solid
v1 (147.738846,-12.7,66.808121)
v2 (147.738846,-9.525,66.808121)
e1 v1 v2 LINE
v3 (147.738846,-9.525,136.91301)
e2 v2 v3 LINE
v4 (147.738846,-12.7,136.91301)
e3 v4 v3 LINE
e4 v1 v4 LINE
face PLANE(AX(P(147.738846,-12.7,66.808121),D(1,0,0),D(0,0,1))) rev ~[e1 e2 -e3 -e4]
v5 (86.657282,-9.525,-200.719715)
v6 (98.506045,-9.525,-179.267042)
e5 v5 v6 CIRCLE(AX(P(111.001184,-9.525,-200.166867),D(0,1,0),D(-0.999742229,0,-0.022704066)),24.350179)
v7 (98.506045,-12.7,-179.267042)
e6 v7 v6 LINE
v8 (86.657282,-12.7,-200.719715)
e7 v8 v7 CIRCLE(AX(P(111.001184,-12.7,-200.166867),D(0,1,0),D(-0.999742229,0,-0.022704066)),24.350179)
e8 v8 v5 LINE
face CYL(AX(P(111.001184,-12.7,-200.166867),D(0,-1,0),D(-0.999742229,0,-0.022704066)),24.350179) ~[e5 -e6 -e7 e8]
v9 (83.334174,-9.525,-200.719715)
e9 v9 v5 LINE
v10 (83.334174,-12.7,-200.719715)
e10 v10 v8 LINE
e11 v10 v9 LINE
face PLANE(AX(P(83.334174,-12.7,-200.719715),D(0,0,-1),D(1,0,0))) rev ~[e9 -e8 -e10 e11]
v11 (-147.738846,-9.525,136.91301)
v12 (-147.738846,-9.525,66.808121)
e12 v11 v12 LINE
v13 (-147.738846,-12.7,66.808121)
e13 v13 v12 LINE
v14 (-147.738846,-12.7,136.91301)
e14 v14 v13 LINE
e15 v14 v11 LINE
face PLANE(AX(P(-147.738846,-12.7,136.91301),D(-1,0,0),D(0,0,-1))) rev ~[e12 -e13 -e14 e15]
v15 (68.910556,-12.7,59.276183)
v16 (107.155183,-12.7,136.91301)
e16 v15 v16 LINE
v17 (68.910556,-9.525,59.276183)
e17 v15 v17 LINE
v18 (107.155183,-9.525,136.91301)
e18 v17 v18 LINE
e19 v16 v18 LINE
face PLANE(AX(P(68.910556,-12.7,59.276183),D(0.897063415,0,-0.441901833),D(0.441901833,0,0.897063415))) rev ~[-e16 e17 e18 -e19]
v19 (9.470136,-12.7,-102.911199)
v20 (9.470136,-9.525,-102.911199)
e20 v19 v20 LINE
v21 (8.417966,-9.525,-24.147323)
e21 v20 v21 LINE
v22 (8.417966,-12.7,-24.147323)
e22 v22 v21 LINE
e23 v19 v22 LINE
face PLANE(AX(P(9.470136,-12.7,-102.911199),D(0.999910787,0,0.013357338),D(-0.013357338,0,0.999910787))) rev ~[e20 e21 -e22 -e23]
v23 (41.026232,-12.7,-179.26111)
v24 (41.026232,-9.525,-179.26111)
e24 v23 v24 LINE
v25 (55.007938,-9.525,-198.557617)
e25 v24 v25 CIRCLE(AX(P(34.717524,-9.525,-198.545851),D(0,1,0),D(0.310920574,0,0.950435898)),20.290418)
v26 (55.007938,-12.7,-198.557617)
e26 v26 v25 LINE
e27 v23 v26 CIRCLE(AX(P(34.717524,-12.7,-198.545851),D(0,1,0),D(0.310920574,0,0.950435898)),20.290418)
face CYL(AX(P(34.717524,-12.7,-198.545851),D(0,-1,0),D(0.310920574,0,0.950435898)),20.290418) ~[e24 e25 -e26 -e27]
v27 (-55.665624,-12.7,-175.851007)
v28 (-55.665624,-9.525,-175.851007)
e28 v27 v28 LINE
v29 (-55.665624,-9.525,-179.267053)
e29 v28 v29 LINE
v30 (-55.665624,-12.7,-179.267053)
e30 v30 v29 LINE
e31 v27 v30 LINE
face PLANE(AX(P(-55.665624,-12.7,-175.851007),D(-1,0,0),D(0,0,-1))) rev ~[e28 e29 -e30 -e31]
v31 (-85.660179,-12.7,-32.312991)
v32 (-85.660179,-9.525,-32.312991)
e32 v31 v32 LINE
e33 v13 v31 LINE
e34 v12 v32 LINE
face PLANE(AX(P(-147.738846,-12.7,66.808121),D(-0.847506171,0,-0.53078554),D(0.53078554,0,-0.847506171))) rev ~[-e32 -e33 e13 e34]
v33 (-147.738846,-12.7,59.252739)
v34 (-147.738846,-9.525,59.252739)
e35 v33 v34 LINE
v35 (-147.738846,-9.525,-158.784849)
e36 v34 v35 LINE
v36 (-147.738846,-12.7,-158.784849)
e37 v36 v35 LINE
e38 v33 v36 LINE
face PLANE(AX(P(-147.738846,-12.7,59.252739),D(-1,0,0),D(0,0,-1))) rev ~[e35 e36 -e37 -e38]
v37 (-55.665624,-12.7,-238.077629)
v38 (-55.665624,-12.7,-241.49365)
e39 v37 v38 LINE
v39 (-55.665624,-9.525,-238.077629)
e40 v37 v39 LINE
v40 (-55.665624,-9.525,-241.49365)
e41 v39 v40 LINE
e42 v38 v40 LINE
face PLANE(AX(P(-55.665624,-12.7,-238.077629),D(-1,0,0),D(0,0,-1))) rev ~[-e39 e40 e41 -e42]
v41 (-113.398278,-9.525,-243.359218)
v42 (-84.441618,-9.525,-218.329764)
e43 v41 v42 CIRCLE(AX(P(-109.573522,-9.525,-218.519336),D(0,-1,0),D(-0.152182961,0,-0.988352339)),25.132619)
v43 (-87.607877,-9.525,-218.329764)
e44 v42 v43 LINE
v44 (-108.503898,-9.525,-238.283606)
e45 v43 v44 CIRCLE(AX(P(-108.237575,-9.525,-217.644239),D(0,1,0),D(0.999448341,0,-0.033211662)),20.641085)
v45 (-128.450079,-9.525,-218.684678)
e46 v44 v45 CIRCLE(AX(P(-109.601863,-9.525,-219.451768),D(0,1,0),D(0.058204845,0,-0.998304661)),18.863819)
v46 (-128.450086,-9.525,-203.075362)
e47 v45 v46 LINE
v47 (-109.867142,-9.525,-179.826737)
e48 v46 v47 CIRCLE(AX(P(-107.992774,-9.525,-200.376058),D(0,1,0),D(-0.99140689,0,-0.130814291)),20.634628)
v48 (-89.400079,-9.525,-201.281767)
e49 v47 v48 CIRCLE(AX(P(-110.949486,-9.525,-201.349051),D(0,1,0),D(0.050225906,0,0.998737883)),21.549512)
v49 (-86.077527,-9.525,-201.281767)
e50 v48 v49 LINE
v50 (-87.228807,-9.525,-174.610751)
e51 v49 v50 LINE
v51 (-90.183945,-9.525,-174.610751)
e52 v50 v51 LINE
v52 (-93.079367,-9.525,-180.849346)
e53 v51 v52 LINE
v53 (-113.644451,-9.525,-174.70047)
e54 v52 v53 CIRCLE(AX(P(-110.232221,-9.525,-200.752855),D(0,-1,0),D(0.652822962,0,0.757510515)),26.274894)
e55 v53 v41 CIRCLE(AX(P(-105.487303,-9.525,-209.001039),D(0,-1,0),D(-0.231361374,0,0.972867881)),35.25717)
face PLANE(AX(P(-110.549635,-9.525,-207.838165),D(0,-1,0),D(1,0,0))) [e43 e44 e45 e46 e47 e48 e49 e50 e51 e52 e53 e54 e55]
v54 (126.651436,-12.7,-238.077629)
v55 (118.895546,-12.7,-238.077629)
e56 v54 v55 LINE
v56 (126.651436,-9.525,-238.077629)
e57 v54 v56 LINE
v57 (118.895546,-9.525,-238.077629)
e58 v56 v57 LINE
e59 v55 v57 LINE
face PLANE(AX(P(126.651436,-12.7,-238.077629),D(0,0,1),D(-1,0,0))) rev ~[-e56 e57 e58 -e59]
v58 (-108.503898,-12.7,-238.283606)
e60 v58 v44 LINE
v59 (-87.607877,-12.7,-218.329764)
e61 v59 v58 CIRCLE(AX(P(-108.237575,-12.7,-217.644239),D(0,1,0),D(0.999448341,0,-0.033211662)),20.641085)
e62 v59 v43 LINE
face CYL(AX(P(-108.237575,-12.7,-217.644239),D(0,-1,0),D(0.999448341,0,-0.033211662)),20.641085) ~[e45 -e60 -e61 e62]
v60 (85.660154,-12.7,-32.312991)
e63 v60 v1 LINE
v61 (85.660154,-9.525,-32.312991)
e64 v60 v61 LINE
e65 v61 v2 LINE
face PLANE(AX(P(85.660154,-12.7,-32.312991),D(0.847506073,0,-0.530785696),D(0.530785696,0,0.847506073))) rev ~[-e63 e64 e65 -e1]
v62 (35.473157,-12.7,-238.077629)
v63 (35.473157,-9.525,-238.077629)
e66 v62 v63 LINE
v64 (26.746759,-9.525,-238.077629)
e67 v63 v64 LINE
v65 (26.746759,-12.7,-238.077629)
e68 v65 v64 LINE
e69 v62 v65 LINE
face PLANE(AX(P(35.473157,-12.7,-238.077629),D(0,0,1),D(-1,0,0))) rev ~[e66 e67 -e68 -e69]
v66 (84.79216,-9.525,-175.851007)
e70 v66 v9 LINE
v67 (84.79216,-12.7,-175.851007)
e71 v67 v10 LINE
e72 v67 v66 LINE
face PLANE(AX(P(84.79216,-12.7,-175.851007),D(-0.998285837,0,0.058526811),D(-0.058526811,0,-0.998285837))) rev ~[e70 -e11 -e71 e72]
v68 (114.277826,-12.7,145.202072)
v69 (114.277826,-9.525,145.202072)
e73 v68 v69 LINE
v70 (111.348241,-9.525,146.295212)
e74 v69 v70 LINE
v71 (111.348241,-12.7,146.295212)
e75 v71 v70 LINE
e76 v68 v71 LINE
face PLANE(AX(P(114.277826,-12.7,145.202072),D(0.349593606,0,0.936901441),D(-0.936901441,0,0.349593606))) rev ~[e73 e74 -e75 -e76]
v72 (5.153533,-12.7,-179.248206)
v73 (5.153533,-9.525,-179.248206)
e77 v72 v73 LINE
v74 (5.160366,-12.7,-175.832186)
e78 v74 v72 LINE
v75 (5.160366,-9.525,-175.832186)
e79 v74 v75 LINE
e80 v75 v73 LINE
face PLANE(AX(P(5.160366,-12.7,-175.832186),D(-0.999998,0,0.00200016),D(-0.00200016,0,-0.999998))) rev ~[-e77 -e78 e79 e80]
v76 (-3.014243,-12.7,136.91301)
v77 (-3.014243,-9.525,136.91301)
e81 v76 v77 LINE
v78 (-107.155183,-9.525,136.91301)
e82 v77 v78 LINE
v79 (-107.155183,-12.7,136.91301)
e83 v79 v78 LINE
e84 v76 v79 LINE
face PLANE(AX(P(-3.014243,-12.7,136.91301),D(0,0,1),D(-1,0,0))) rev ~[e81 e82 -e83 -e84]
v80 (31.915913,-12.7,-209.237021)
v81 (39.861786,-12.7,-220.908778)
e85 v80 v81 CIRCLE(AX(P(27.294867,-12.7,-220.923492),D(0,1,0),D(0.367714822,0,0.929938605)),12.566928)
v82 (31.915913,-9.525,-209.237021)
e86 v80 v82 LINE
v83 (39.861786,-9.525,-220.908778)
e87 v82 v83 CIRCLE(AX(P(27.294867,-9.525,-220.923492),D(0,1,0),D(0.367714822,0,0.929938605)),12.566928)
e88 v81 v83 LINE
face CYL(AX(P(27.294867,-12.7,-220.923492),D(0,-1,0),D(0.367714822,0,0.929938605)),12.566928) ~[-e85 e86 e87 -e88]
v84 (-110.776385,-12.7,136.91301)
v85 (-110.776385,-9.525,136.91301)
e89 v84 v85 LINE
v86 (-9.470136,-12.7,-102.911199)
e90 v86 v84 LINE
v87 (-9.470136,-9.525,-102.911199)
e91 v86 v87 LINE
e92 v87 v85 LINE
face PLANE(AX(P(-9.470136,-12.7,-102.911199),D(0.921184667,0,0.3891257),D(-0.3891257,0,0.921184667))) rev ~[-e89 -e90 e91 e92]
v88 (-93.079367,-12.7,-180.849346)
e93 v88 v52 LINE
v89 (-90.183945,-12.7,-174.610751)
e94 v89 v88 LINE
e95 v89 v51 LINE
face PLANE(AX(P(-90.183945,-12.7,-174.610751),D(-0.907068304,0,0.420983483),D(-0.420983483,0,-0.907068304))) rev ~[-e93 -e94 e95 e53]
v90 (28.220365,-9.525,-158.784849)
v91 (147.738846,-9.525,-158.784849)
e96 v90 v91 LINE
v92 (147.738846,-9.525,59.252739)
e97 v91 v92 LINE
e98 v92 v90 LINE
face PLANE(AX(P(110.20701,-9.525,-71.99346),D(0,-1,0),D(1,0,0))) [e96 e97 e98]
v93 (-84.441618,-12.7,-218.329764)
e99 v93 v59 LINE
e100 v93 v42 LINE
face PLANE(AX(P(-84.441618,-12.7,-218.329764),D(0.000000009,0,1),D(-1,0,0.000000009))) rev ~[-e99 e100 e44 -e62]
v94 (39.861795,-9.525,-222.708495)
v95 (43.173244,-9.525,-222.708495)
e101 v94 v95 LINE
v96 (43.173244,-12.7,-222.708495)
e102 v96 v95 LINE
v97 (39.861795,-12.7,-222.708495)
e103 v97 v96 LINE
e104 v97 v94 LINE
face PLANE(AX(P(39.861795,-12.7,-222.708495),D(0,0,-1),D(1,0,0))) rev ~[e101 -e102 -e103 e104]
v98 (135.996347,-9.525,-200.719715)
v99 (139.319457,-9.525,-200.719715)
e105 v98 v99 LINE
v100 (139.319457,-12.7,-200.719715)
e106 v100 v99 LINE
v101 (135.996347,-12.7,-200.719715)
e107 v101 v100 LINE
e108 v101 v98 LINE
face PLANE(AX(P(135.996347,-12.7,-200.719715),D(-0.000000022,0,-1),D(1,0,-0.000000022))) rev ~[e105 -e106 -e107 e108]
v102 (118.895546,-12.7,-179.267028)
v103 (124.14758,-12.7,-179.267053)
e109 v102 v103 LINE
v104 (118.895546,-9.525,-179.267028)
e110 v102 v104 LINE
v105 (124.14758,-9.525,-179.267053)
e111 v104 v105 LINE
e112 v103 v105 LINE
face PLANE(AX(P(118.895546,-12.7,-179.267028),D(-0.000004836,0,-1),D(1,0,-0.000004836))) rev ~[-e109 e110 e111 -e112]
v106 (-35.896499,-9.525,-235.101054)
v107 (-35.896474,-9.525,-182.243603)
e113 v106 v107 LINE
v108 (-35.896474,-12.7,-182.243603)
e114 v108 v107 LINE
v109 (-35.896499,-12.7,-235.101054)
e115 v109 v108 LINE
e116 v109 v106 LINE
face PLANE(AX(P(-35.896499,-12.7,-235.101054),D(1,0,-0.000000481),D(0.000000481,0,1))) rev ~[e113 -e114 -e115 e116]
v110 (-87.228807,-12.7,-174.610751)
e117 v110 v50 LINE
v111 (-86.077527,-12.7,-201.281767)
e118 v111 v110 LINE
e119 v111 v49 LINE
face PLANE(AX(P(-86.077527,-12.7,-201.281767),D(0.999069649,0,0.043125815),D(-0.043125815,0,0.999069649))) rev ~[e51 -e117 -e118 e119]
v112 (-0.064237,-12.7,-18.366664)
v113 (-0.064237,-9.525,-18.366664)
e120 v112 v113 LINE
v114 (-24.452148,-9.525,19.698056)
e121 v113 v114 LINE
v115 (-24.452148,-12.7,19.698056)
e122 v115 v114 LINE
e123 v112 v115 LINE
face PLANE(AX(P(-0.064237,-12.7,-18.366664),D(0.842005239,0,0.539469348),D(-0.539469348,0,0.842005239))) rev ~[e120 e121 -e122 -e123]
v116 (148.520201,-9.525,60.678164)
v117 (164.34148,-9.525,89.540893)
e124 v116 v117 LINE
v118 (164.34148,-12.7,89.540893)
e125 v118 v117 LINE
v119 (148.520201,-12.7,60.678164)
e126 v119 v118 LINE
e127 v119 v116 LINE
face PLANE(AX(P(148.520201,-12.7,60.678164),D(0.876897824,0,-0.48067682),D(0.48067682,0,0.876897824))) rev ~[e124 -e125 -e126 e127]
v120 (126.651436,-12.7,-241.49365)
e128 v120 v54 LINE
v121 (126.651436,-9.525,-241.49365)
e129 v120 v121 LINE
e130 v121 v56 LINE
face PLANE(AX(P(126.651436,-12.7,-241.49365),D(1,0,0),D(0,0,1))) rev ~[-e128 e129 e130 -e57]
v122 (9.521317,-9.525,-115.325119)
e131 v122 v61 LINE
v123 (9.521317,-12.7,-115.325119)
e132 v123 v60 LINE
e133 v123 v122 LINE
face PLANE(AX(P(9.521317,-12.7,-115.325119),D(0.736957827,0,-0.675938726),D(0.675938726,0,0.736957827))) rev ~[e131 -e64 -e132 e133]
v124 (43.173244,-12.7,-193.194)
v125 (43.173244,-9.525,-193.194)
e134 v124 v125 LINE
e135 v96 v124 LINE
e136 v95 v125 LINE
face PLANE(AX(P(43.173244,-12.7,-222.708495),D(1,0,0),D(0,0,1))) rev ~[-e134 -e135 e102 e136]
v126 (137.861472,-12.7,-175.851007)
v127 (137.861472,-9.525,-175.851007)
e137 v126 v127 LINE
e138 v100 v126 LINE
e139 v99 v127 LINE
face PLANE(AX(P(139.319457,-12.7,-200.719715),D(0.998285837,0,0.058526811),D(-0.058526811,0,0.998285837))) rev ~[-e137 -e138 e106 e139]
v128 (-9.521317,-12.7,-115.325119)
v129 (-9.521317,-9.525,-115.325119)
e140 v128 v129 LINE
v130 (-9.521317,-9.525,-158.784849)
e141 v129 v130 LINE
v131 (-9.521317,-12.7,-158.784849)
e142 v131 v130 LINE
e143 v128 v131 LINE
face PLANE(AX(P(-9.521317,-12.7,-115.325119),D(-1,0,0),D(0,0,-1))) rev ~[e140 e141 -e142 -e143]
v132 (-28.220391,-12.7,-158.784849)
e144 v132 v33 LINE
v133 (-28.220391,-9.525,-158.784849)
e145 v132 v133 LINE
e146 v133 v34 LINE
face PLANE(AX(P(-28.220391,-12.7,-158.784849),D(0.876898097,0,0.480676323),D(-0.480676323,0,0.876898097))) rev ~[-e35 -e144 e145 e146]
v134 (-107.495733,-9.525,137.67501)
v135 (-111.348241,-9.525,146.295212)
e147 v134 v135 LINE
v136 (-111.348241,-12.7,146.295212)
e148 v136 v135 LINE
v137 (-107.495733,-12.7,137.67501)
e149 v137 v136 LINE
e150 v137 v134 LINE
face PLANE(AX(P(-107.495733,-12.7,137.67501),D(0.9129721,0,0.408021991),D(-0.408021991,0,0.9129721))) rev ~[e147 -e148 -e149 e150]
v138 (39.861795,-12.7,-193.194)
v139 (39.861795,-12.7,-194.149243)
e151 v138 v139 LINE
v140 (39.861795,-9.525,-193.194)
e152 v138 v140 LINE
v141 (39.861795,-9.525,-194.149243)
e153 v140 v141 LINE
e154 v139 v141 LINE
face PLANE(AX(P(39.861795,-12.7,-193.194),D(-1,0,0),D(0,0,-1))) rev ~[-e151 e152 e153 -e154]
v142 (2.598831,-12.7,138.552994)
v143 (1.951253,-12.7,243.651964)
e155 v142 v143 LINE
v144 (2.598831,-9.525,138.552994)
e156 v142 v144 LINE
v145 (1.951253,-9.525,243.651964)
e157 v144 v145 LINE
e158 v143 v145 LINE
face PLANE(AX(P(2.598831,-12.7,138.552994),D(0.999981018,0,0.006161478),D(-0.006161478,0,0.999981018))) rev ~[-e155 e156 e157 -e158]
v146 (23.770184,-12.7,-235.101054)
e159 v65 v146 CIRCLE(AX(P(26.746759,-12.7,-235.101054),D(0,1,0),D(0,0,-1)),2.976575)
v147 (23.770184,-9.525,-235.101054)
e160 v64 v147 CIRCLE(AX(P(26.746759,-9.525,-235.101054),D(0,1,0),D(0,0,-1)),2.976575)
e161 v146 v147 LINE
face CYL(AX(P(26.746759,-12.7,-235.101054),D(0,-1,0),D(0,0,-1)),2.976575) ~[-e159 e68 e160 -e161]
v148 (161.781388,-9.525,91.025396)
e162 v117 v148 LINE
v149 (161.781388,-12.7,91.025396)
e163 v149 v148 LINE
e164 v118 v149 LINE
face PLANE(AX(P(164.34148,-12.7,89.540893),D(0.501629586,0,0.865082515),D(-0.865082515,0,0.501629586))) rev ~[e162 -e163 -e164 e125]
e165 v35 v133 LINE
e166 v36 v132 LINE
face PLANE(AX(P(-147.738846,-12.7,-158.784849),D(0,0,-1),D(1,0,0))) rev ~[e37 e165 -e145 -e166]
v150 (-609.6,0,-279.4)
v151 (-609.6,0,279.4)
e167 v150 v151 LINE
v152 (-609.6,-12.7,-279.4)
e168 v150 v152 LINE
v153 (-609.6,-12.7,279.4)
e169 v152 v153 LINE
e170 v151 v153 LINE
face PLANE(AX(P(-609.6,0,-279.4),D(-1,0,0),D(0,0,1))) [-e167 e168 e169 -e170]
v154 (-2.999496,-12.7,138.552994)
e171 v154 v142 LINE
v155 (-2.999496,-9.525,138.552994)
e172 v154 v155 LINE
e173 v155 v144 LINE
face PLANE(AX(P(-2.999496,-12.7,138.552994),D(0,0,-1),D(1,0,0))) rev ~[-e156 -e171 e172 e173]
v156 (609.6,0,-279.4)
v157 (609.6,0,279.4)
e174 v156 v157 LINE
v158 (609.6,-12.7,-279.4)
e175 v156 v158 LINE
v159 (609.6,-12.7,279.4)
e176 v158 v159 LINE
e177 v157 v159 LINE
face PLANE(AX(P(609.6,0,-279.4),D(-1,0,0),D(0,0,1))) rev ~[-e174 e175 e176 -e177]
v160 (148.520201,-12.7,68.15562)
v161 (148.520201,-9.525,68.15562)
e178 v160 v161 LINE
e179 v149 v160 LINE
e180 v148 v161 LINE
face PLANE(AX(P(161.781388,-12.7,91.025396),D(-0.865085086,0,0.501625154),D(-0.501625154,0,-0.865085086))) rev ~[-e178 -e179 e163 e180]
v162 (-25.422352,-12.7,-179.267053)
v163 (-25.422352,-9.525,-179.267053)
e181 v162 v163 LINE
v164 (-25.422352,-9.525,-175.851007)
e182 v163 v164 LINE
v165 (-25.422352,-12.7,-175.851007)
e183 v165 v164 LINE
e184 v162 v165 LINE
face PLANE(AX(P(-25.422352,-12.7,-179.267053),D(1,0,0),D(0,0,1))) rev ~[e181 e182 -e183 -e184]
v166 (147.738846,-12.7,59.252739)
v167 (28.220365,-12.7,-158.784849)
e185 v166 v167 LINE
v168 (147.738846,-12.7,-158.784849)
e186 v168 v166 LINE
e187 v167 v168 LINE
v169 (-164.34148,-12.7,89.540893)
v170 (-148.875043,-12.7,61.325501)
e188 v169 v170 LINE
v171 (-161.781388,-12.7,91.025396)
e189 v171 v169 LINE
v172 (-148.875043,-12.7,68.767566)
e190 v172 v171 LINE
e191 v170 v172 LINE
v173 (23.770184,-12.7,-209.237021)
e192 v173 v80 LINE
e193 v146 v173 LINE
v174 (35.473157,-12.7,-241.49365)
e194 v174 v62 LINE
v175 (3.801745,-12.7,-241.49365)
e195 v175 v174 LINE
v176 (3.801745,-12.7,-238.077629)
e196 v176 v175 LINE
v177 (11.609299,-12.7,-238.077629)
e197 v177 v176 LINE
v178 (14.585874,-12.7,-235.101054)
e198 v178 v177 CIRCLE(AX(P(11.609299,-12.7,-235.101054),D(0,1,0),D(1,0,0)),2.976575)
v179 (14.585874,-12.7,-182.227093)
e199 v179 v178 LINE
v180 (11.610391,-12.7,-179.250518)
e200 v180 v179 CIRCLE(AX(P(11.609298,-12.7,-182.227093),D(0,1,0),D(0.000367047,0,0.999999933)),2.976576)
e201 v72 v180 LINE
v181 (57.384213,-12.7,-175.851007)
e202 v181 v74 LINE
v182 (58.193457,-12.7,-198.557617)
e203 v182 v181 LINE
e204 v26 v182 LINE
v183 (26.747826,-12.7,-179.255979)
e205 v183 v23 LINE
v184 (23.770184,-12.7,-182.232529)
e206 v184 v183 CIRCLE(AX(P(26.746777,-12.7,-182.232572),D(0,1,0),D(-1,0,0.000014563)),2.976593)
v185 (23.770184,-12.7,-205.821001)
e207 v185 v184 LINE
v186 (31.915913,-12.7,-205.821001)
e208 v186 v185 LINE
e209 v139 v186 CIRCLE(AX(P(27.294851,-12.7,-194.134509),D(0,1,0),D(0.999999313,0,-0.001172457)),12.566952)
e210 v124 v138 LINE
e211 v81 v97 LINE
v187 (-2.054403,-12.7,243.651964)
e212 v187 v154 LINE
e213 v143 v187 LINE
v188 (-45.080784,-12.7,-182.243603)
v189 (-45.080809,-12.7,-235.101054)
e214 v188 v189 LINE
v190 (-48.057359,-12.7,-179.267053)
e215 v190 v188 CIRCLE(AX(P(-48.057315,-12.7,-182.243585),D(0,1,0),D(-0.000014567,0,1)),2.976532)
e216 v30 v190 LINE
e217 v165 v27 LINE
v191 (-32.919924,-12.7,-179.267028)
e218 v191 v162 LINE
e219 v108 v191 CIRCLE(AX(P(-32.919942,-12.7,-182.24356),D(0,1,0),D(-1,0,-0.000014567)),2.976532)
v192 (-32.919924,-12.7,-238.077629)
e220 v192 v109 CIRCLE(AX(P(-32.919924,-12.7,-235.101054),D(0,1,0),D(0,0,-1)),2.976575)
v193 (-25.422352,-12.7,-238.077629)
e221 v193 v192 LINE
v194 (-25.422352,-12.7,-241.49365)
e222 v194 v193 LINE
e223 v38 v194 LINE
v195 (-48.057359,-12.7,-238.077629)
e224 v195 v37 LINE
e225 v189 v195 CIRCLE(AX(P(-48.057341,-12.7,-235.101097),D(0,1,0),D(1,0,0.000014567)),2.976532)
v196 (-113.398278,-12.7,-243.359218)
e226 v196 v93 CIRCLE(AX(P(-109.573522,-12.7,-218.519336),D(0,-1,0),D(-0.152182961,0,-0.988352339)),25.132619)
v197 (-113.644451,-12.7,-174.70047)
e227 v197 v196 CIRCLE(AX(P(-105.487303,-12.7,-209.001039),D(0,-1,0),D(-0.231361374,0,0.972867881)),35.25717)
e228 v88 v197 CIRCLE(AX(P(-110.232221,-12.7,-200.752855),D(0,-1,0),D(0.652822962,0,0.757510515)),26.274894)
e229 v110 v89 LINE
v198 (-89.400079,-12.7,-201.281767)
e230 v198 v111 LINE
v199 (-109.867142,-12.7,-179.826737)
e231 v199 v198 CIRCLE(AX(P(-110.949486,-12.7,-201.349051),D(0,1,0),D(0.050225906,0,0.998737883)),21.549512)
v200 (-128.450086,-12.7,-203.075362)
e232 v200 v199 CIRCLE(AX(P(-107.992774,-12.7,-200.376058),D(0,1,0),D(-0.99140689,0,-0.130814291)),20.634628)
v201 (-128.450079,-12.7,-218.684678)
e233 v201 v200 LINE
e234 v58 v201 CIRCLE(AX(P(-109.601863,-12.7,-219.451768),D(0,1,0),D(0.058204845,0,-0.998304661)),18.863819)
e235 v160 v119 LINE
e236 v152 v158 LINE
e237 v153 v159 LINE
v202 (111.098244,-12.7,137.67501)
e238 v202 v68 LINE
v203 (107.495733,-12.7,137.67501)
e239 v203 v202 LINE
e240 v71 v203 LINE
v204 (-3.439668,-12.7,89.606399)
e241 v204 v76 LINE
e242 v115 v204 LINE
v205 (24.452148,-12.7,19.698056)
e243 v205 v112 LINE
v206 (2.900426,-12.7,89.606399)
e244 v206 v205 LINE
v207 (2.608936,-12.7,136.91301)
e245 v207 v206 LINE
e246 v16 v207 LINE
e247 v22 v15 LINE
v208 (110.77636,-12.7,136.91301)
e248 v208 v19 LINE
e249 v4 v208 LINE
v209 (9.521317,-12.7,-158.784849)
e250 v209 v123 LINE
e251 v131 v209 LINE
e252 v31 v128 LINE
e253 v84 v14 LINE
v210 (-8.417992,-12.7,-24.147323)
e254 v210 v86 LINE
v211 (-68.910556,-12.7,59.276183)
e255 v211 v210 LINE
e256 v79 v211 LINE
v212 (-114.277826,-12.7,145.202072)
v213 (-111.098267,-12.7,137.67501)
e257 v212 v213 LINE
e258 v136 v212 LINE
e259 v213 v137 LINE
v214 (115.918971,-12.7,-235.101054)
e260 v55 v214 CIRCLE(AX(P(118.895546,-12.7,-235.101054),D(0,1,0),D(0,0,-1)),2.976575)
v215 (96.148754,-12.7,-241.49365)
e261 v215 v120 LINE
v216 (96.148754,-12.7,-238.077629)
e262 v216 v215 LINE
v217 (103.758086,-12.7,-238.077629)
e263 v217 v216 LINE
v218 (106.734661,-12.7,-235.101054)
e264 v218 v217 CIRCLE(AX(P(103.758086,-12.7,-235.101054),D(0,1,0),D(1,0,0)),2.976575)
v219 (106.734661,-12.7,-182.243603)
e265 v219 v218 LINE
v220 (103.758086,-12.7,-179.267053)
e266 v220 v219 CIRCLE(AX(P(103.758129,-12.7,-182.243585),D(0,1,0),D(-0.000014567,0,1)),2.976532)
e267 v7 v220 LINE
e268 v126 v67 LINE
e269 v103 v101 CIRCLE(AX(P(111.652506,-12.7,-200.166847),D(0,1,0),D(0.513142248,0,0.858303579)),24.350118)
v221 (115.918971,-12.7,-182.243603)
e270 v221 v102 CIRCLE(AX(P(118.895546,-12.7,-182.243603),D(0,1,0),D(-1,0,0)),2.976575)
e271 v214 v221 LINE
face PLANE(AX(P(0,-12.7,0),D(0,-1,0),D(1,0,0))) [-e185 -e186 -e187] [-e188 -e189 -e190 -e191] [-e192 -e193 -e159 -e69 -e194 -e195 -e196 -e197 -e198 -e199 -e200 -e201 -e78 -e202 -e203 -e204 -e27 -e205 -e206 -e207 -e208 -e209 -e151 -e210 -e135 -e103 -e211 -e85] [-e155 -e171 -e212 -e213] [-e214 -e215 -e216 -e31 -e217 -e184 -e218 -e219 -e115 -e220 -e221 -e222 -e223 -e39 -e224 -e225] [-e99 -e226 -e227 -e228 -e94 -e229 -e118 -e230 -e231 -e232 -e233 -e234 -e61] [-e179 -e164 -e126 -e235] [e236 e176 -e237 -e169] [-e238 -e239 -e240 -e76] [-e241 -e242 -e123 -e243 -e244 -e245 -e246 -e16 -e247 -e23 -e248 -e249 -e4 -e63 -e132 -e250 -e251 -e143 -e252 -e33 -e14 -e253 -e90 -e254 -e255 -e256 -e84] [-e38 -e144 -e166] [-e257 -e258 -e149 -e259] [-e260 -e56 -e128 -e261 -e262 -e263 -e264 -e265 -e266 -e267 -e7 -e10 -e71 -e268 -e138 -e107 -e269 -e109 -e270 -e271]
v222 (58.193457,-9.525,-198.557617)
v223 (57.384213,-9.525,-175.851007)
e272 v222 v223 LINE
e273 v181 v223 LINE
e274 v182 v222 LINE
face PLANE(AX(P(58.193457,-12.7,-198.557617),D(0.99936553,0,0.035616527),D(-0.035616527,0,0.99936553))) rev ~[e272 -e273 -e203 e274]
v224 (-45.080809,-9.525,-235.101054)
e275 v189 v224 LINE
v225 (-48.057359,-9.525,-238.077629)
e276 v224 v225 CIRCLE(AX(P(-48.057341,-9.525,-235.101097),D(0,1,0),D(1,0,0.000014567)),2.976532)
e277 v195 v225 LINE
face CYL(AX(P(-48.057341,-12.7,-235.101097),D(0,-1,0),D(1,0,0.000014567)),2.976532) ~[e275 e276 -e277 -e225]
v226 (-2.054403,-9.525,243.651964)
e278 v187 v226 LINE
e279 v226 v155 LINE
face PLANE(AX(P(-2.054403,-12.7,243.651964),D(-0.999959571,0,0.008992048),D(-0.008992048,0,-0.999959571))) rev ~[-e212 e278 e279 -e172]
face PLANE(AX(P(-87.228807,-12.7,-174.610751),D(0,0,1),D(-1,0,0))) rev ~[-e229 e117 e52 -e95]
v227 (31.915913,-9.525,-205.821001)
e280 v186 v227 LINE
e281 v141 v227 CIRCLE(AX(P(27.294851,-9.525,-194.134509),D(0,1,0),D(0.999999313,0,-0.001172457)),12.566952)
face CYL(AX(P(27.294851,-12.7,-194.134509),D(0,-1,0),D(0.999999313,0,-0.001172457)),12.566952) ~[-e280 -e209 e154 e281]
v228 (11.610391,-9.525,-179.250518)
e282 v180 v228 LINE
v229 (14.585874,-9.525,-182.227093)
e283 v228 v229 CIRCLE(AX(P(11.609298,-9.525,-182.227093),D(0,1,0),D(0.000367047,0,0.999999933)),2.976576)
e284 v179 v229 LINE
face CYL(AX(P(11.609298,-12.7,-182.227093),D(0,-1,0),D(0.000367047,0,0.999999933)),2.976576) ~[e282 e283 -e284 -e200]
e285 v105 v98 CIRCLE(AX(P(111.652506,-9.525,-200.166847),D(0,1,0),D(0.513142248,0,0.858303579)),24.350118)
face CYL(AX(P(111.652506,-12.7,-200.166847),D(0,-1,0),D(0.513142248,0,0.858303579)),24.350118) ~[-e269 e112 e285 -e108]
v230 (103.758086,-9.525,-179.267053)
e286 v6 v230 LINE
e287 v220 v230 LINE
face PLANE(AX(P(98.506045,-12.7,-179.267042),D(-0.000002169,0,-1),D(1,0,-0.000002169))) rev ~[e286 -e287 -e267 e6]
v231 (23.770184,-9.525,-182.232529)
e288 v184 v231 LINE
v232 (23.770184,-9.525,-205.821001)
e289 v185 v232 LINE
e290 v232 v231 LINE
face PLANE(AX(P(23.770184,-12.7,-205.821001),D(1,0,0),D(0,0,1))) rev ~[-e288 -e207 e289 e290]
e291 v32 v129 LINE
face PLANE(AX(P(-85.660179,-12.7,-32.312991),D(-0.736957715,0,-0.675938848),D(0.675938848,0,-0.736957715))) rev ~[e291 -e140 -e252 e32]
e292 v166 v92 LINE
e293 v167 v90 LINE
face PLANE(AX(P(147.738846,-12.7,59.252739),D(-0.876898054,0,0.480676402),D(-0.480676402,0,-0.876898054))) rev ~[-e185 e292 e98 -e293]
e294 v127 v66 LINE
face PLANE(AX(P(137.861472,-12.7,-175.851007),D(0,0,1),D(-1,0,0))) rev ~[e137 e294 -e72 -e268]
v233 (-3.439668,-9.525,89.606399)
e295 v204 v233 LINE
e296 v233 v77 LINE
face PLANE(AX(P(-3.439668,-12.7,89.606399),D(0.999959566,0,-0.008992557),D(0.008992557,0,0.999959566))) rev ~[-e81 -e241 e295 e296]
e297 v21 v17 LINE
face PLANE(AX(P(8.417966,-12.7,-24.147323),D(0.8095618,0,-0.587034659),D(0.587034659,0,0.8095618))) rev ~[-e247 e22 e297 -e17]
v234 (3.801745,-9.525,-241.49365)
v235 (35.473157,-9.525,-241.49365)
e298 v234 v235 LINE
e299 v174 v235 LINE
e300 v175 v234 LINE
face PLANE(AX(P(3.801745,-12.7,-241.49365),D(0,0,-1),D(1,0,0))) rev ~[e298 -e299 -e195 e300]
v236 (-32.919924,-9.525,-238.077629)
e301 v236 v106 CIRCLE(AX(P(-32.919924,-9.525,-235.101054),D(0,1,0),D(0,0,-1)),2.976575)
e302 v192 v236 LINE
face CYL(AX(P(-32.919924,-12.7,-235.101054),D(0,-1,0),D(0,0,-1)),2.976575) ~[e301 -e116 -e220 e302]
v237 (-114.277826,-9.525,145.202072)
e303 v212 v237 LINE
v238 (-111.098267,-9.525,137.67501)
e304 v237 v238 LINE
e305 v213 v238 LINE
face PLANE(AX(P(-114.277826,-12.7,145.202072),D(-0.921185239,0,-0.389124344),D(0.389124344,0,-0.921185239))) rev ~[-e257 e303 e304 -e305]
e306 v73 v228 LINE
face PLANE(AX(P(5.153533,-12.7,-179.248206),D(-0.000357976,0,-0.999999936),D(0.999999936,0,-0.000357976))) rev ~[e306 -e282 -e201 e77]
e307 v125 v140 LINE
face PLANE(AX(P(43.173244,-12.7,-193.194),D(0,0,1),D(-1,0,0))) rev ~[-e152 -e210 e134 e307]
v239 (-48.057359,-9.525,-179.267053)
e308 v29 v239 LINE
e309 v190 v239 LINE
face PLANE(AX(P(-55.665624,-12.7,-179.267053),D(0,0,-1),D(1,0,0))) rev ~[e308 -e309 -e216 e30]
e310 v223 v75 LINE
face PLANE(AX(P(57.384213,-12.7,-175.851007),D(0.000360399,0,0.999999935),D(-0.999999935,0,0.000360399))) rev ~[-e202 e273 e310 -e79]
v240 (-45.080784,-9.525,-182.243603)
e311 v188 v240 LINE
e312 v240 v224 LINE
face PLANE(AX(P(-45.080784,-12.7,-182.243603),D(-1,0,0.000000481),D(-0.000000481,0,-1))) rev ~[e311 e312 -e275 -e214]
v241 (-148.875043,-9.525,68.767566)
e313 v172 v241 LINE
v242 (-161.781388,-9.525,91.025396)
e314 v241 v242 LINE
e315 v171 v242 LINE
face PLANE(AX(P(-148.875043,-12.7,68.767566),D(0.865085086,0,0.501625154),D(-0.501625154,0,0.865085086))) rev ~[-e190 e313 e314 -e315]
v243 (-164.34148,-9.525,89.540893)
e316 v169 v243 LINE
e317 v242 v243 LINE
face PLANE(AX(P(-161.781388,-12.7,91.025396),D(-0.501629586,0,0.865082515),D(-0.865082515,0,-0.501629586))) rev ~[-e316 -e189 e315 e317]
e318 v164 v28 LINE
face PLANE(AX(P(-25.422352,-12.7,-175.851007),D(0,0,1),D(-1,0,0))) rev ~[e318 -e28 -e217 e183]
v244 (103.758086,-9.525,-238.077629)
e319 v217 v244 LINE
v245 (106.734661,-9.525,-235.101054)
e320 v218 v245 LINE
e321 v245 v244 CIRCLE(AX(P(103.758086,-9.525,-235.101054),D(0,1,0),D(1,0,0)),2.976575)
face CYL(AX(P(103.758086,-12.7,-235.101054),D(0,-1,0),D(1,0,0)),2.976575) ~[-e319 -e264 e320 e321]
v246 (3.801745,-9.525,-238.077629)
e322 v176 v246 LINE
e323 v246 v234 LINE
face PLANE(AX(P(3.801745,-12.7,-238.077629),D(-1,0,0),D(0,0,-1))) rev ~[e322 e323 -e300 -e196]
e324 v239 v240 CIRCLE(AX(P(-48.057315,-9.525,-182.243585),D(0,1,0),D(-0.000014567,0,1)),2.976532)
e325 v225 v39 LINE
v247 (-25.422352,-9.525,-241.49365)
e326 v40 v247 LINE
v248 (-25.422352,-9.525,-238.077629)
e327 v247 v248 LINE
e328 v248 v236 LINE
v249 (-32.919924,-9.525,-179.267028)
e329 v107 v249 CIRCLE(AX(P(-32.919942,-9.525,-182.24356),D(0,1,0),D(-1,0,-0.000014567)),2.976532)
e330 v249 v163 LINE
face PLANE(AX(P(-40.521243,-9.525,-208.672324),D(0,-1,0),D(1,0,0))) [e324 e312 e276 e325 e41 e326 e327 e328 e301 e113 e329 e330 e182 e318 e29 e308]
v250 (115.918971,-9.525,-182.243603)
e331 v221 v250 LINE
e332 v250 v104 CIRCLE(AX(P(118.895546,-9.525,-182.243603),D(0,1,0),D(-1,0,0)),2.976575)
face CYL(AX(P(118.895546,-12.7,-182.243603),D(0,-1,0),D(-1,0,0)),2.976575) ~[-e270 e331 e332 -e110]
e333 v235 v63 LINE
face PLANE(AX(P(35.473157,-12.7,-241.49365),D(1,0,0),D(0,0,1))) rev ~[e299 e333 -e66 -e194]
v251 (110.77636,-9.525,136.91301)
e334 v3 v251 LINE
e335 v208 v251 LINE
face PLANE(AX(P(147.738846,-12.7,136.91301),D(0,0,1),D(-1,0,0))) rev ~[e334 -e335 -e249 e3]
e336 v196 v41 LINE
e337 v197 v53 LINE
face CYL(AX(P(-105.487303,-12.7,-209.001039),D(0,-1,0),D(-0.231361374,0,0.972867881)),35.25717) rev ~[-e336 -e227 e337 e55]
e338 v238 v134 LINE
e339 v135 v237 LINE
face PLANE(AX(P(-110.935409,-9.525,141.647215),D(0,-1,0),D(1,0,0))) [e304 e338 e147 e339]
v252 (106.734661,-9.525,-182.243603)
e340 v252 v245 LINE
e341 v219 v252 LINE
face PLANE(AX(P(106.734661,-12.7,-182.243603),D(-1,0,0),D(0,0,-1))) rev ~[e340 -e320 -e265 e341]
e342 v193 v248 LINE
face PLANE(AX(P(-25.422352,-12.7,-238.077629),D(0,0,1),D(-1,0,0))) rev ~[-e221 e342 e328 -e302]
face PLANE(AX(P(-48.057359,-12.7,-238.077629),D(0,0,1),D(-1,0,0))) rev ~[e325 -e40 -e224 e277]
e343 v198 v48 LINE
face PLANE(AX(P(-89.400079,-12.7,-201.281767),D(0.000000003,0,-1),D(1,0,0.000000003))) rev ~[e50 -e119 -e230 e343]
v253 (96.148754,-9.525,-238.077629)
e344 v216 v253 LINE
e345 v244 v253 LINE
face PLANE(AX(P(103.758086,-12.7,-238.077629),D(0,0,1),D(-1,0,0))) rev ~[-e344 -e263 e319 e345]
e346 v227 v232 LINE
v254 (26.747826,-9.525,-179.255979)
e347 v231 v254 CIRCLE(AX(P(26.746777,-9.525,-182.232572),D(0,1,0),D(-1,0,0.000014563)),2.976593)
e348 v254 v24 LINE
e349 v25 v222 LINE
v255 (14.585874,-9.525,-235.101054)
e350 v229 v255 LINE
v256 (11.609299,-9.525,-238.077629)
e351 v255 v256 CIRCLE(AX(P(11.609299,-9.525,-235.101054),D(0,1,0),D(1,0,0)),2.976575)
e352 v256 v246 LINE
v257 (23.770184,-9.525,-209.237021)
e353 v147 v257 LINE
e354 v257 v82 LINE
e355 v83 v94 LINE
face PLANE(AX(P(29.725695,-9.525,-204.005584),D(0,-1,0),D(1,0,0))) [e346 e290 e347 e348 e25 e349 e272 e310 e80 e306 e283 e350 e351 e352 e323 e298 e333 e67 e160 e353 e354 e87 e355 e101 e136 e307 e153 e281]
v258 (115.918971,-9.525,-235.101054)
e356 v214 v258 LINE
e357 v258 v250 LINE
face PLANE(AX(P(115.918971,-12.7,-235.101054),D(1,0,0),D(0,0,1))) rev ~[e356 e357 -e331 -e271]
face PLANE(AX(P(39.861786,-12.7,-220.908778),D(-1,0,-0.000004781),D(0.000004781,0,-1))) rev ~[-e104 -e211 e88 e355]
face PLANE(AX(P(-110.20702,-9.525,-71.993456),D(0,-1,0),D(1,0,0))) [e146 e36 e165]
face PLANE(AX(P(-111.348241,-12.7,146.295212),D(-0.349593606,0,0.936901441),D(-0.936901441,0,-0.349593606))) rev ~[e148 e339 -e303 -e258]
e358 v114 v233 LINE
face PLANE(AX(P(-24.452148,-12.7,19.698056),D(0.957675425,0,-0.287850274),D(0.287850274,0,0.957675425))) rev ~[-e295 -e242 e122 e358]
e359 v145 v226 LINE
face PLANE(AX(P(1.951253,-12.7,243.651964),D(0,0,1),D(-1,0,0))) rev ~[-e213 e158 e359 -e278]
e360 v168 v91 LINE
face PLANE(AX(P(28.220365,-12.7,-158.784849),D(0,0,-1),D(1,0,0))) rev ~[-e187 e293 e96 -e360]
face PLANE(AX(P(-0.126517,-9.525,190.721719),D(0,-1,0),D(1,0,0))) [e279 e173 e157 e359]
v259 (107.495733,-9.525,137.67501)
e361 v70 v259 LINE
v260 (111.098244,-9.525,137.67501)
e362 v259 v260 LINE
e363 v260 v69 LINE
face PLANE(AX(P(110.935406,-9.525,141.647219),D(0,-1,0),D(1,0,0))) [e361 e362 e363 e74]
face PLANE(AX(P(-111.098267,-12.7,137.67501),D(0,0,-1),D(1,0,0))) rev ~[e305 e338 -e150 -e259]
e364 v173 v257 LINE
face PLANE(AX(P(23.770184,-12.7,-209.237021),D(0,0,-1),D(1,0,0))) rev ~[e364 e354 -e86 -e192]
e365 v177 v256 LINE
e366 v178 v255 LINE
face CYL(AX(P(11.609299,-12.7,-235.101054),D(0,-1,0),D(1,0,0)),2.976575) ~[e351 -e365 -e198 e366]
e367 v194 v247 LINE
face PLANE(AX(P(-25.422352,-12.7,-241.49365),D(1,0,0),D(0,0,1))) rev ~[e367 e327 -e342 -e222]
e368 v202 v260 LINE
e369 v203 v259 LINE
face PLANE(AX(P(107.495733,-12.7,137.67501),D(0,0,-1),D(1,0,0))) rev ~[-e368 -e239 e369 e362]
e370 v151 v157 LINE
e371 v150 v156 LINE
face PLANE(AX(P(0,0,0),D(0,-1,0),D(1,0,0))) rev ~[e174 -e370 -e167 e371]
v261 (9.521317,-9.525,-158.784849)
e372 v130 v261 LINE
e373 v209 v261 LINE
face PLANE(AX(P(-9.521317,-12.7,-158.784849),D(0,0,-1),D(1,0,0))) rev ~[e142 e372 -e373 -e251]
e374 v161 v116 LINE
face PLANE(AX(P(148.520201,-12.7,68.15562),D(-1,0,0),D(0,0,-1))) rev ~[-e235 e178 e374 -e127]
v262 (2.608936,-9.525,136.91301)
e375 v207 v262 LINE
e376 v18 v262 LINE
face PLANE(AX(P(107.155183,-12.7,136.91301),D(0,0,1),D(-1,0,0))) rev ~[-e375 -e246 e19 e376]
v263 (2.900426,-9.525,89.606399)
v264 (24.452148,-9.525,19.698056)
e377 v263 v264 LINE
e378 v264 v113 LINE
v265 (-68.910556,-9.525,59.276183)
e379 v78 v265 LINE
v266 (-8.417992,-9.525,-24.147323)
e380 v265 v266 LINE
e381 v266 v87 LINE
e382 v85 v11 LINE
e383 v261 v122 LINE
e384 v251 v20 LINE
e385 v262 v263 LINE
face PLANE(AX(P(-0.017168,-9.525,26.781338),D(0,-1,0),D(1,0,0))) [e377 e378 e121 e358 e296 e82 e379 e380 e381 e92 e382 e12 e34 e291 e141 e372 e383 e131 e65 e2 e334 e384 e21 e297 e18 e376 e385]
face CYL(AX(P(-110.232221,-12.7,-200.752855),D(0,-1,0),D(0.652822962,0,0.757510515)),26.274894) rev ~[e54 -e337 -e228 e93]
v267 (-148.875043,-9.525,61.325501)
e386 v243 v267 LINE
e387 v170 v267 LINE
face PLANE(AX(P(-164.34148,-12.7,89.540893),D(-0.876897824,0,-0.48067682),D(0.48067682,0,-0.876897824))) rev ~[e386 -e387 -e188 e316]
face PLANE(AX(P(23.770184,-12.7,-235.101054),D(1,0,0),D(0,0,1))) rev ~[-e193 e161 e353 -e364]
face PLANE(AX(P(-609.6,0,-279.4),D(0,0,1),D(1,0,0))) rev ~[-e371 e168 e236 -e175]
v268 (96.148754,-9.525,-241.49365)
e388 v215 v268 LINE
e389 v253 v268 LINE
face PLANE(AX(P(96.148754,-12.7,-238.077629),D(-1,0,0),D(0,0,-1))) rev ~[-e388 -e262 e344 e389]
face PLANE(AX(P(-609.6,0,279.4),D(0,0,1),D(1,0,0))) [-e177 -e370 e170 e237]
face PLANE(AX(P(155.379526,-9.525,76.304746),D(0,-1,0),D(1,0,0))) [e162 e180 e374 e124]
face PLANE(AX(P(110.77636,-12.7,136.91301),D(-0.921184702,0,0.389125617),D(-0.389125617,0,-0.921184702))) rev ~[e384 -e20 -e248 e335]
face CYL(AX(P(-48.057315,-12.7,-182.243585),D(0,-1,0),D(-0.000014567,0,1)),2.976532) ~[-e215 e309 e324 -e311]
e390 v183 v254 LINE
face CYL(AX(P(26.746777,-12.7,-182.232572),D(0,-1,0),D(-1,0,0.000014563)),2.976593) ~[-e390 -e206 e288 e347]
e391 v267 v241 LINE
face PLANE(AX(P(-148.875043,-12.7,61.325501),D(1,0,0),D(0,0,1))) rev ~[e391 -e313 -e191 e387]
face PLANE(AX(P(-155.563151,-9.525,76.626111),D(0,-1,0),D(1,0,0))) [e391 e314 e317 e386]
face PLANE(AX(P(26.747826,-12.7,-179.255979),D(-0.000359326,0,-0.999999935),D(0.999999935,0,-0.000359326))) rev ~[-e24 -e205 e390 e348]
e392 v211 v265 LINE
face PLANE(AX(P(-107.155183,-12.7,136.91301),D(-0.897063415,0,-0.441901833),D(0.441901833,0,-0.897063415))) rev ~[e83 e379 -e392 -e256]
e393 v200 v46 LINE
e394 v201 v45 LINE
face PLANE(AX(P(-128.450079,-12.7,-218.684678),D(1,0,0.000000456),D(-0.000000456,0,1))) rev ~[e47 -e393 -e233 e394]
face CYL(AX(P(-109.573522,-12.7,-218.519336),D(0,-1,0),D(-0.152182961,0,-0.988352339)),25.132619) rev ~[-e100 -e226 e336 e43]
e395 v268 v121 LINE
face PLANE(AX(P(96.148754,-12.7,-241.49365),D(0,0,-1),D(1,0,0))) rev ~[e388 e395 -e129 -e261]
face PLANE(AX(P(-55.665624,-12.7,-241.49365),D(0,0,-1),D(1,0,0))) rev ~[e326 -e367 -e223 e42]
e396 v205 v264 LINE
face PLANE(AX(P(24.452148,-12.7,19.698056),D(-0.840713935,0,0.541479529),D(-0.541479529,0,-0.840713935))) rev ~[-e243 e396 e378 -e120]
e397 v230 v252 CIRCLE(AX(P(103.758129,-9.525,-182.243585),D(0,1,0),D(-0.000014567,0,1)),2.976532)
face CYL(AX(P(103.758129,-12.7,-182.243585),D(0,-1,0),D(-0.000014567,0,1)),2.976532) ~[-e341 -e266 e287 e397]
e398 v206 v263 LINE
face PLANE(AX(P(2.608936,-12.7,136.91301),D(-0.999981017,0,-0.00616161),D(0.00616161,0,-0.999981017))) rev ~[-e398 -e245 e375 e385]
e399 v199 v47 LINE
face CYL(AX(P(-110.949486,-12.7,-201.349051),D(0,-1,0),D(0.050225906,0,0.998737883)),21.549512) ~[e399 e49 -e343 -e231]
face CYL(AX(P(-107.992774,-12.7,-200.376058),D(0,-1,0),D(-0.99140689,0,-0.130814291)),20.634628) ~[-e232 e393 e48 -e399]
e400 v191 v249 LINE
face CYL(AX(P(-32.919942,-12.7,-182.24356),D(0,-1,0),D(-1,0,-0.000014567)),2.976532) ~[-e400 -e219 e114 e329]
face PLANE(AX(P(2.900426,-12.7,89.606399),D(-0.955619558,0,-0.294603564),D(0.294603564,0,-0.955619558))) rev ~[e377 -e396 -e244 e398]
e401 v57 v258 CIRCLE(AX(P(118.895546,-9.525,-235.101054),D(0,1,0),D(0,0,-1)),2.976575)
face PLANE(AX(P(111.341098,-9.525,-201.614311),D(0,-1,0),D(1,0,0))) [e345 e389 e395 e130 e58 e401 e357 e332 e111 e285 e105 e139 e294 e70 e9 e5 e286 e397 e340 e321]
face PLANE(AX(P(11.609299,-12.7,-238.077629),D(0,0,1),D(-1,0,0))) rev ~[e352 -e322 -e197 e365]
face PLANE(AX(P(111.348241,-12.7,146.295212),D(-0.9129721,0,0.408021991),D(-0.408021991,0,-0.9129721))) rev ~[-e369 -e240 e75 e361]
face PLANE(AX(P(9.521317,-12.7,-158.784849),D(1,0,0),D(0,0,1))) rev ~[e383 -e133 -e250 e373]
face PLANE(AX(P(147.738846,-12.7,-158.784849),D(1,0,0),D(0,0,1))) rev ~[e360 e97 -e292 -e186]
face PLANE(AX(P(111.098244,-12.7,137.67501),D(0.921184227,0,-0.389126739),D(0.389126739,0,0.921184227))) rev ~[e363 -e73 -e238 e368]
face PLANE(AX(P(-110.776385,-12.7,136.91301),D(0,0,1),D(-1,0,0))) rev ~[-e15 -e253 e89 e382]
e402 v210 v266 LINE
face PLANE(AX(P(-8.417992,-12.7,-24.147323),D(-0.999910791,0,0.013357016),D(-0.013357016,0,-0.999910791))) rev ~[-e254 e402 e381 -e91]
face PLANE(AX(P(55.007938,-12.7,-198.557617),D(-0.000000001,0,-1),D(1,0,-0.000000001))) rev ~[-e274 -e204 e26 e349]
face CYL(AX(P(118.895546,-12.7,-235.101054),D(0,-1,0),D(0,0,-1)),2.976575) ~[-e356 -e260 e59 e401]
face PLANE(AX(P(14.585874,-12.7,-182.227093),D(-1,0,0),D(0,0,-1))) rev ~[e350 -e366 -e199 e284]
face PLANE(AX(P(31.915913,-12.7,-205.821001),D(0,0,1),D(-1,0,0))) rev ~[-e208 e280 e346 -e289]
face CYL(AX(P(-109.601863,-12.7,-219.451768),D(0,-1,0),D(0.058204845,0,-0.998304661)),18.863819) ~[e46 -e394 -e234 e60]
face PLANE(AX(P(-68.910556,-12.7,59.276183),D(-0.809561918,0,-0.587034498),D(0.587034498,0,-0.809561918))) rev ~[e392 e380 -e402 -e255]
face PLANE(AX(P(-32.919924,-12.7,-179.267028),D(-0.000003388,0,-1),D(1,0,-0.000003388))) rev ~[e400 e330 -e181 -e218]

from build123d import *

# Parameters (mm, degrees)
F0_W     = 1219.2
F0_H     = 558.8
F1_DEPTH = 12.7
F3_DEPTH = 3.175


# Not quite as in the source:
# - ends of sketch curves that miss each other by under 0.0002 mm in the source are joined


with BuildPart() as f1:
    # F0 (on Front) → F1 (new body)
    with BuildSketch(Plane.XZ):
        Rectangle(F0_W, F0_H)
    extrude(amount=F1_DEPTH)

    # F2 (on face) → F3 (cut)
    with BuildSketch(Plane.XZ.offset(12.7)):
        Polygon((-110.776385, 136.9130104), (-147.738846, 136.9130104), (-147.738846, 66.8081214), (-85.6601792, -32.312991), (-9.521317, -115.3251186), (-9.521317, -158.7848488), (9.521317, -158.7848488), (9.521317, -115.3251186), (85.6601538, -32.312991), (147.738846, 66.8081214), (147.738846, 136.9130104), (110.7763596, 136.9130104), (9.470136, -102.9111988), (8.4179664, -24.1473228), (68.9105556, 59.2761832), (107.1551832, 136.9130104), (2.6089356, 136.9130104), (2.900426, 89.6063994), (24.4521482, 19.6980556), (-0.0642366, -18.3666638), (-24.4521482, 19.6980556), (-3.439668, 89.6063994), (-3.0142434, 136.9130104), (-107.1551832, 136.9130104), (-68.9105556, 59.2761832), (-8.4179918, -24.1473228), (-9.470136, -102.9111988), align=None)
        Polygon((-28.2203906, -158.7848488), (-147.738846, 59.252739), (-147.738846, -158.7848488), align=None)
        Polygon((147.738846, -158.7848488), (147.738846, 59.252739), (28.2203652, -158.7848488), align=None)
        with BuildLine():
            ThreePointArc((-109.8671422064, -179.8267368126), (-95.356903919, -186.4744799885), (-89.4000786424, -201.2817666107))
            Line((-89.4000786424, -201.2817666107), (-86.0775266, -201.2817666))
            Line((-86.0775266, -201.2817666), (-87.228807, -174.6107506))
            Line((-87.228807, -174.6107506), (-90.1839446, -174.6107506))
            Line((-90.1839446, -174.6107506), (-93.0793668, -180.8493462))
            ThreePointArc((-93.0793668, -180.8493462), (-102.7053794925, -175.5791240788), (-113.6444505241, -174.7004700875))
            ThreePointArc((-113.6444505241, -174.7004700875), (-140.7442467729, -209.1274434593), (-113.39827807, -243.3592184707))
            ThreePointArc((-113.39827807, -243.3592184707), (-93.1382802166, -237.533313942), (-84.4416180716, -218.3297640292))
            Line((-84.4416180716, -218.3297640292), (-87.6078766, -218.329764))
            ThreePointArc((-87.6078766, -218.329764), (-93.9825550775, -232.5723606205), (-108.5038975848, -238.2836063253))
            ThreePointArc((-108.5038975848, -238.2836063253), (-122.8229554836, -232.9071157052), (-128.4500788749, -218.68467849))
            Line((-128.4500788749, -218.68467849), (-128.450086, -203.0753622))
            ThreePointArc((-128.450086, -203.0753622), (-124.1111022303, -187.4924501184), (-109.8671422064, -179.8267368126))
        make_face()
        with BuildLine():
            Line((-55.665624, -238.077629), (-55.665624, -241.4936496))
            Line((-55.665624, -241.4936496), (-25.422352, -241.4936496))
            Line((-25.422352, -241.4936496), (-25.422352, -238.077629))
            Line((-25.422352, -238.077629), (-32.919924, -238.077629))
            ThreePointArc((-32.919924, -238.077629), (-35.0246805086, -237.2058103086), (-35.8964992, -235.1010538))
            Line((-35.8964992, -235.1010538), (-35.8964738, -182.243603))
            ThreePointArc((-35.8964738, -182.243603), (-35.0246805086, -180.1388464914), (-32.919924, -179.2670278))
            Line((-32.919924, -179.2670278), (-25.422352, -179.2670532))
            Line((-25.422352, -179.2670532), (-25.422352, -175.8510072))
            Line((-25.422352, -175.8510072), (-55.665624, -175.8510072))
            Line((-55.665624, -175.8510072), (-55.665624, -179.2670532))
            Line((-55.665624, -179.2670532), (-48.0573588, -179.2670532))
            ThreePointArc((-48.0573588, -179.2670532), (-45.9526022914, -180.1388464914), (-45.0807836, -182.243603))
            Line((-45.0807836, -182.243603), (-45.080809, -235.1010538))
            ThreePointArc((-45.080809, -235.1010538), (-45.9526022914, -237.2058103086), (-48.0573588, -238.077629))
            Line((-48.0573588, -238.077629), (-55.665624, -238.077629))
        make_face()
        with BuildLine():
            Line((31.9159128, -205.8210006), (23.7701836, -205.8210006))
            Line((23.7701836, -205.8210006), (23.7701836, -182.2325286))
            ThreePointArc((23.7701836, -182.2325286), (24.6423974564, -180.1274129149), (26.7478255999, -179.2559789912))
            Line((26.7478255999, -179.2559789912), (41.0262324, -179.2611096))
            ThreePointArc((41.0262324, -179.2611096), (51.1481998687, -186.6406443843), (55.0079383919, -198.557616598))
            Line((55.0079383919, -198.557616598), (58.1934574, -198.5576166))
            Line((58.1934574, -198.5576166), (57.3842134, -175.8510072))
            Line((57.3842134, -175.8510072), (5.1603656, -175.8321858))
            Line((5.1603656, -175.8321858), (5.153533, -179.2482064))
            Line((5.153533, -179.2482064), (11.6103908, -179.2505178))
            ThreePointArc((11.6103908, -179.2505178), (13.7144412242, -180.1227226778), (14.5858738, -182.227093))
            Line((14.5858738, -182.227093), (14.5858738, -235.1010538))
            ThreePointArc((14.5858738, -235.1010538), (13.7140551086, -237.2058103086), (11.6092986, -238.077629))
            Line((11.6092986, -238.077629), (3.801745, -238.077629))
            Line((3.801745, -238.077629), (3.801745, -241.4936496))
            Line((3.801745, -241.4936496), (35.4731574, -241.4936496))
            Line((35.4731574, -241.4936496), (35.4731574, -238.077629))
            Line((35.4731574, -238.077629), (26.7467588, -238.077629))
            ThreePointArc((26.7467588, -238.077629), (24.6420022914, -237.2058103086), (23.7701836, -235.1010538))
            Line((23.7701836, -235.1010538), (23.7701836, -209.2370212))
            Line((23.7701836, -209.2370212), (31.9159128, -209.2370212))
            ThreePointArc((31.9159128, -209.2370212), (37.6830347812, -213.8514597759), (39.8617861947, -220.9087784101))
            Line((39.8617861947, -220.9087784101), (39.8617948, -222.7084954))
            Line((39.8617948, -222.7084954), (43.1732436, -222.7084954))
            Line((43.1732436, -222.7084954), (43.1732436, -193.1940002))
            Line((43.1732436, -193.1940002), (39.8617948, -193.1940002))
            Line((39.8617948, -193.1940002), (39.8617948, -194.1492434))
            ThreePointArc((39.8617948, -194.1492434), (37.6830347812, -201.2065620241), (31.9159128, -205.8210006))
        make_face()
        with BuildLine():
            Line((106.7346608, -182.243603), (106.7346608, -235.1010538))
            ThreePointArc((106.7346608, -235.1010538), (105.8628421086, -237.2058103086), (103.7580856, -238.077629))
            Line((103.7580856, -238.077629), (96.1487536, -238.077629))
            Line((96.1487536, -238.077629), (96.1487536, -241.4936496))
            Line((96.1487536, -241.4936496), (126.6514358, -241.4936496))
            Line((126.6514358, -241.4936496), (126.6514358, -238.077629))
            Line((126.6514358, -238.077629), (118.8955458, -238.077629))
            ThreePointArc((118.8955458, -238.077629), (116.7907892914, -237.2058103086), (115.9189706, -235.1010538))
            Line((115.9189706, -235.1010538), (115.9189706, -182.243603))
            ThreePointArc((115.9189706, -182.243603), (116.7907892914, -180.1388464914), (118.8955458, -179.2670278))
            Line((118.8955458, -179.2670278), (124.14758, -179.2670532))
            ThreePointArc((124.14758, -179.2670532), (132.9675370035, -188.3940946035), (135.9963466509, -200.7197153285))
            Line((135.9963466509, -200.7197153285), (139.3194572, -200.7197154))
            Line((139.3194572, -200.7197154), (137.8614718, -175.8510072))
            Line((137.8614718, -175.8510072), (84.7921596, -175.8510072))
            Line((84.7921596, -175.8510072), (83.3341742, -200.7197154))
            Line((83.3341742, -200.7197154), (86.6572816, -200.7197154))
            ThreePointArc((86.6572816, -200.7197154), (89.6860943965, -188.3940946035), (98.5060445889, -179.2670418075))
            Line((98.5060445889, -179.2670418075), (103.7580856, -179.2670532))
            ThreePointArc((103.7580856, -179.2670532), (105.8628421086, -180.1388464914), (106.7346608, -182.243603))
        make_face()
        Polygon((-2.0544028, 243.6519638), (-2.9994959967, 138.552993536), (2.5988306881, 138.552993536), (1.9512534, 243.6519638), align=None)
        Polygon((-164.3414798, 89.5408928), (-148.8750427961, 61.3255006909), (-148.8750427961, 68.7675664065), (-161.7813884, 91.0253958), align=None)
        Polygon((-111.3482406, 146.2952116), (-114.2778258, 145.2020718), (-111.0982667862, 137.6750104), (-107.4957333194, 137.6750104), align=None)
        Polygon((111.0982437212, 137.6750104), (114.2778258, 145.2020718), (111.3482406, 146.2952116), (107.4957333194, 137.6750104), align=None)
        Polygon((164.3414798, 89.5408928), (161.7813884, 91.0253958), (148.5202014446, 68.1556195002), (148.5202014446, 60.6781642768), align=None)
    extrude(amount=-F3_DEPTH, mode=Mode.SUBTRACT)


solid = f1.part
